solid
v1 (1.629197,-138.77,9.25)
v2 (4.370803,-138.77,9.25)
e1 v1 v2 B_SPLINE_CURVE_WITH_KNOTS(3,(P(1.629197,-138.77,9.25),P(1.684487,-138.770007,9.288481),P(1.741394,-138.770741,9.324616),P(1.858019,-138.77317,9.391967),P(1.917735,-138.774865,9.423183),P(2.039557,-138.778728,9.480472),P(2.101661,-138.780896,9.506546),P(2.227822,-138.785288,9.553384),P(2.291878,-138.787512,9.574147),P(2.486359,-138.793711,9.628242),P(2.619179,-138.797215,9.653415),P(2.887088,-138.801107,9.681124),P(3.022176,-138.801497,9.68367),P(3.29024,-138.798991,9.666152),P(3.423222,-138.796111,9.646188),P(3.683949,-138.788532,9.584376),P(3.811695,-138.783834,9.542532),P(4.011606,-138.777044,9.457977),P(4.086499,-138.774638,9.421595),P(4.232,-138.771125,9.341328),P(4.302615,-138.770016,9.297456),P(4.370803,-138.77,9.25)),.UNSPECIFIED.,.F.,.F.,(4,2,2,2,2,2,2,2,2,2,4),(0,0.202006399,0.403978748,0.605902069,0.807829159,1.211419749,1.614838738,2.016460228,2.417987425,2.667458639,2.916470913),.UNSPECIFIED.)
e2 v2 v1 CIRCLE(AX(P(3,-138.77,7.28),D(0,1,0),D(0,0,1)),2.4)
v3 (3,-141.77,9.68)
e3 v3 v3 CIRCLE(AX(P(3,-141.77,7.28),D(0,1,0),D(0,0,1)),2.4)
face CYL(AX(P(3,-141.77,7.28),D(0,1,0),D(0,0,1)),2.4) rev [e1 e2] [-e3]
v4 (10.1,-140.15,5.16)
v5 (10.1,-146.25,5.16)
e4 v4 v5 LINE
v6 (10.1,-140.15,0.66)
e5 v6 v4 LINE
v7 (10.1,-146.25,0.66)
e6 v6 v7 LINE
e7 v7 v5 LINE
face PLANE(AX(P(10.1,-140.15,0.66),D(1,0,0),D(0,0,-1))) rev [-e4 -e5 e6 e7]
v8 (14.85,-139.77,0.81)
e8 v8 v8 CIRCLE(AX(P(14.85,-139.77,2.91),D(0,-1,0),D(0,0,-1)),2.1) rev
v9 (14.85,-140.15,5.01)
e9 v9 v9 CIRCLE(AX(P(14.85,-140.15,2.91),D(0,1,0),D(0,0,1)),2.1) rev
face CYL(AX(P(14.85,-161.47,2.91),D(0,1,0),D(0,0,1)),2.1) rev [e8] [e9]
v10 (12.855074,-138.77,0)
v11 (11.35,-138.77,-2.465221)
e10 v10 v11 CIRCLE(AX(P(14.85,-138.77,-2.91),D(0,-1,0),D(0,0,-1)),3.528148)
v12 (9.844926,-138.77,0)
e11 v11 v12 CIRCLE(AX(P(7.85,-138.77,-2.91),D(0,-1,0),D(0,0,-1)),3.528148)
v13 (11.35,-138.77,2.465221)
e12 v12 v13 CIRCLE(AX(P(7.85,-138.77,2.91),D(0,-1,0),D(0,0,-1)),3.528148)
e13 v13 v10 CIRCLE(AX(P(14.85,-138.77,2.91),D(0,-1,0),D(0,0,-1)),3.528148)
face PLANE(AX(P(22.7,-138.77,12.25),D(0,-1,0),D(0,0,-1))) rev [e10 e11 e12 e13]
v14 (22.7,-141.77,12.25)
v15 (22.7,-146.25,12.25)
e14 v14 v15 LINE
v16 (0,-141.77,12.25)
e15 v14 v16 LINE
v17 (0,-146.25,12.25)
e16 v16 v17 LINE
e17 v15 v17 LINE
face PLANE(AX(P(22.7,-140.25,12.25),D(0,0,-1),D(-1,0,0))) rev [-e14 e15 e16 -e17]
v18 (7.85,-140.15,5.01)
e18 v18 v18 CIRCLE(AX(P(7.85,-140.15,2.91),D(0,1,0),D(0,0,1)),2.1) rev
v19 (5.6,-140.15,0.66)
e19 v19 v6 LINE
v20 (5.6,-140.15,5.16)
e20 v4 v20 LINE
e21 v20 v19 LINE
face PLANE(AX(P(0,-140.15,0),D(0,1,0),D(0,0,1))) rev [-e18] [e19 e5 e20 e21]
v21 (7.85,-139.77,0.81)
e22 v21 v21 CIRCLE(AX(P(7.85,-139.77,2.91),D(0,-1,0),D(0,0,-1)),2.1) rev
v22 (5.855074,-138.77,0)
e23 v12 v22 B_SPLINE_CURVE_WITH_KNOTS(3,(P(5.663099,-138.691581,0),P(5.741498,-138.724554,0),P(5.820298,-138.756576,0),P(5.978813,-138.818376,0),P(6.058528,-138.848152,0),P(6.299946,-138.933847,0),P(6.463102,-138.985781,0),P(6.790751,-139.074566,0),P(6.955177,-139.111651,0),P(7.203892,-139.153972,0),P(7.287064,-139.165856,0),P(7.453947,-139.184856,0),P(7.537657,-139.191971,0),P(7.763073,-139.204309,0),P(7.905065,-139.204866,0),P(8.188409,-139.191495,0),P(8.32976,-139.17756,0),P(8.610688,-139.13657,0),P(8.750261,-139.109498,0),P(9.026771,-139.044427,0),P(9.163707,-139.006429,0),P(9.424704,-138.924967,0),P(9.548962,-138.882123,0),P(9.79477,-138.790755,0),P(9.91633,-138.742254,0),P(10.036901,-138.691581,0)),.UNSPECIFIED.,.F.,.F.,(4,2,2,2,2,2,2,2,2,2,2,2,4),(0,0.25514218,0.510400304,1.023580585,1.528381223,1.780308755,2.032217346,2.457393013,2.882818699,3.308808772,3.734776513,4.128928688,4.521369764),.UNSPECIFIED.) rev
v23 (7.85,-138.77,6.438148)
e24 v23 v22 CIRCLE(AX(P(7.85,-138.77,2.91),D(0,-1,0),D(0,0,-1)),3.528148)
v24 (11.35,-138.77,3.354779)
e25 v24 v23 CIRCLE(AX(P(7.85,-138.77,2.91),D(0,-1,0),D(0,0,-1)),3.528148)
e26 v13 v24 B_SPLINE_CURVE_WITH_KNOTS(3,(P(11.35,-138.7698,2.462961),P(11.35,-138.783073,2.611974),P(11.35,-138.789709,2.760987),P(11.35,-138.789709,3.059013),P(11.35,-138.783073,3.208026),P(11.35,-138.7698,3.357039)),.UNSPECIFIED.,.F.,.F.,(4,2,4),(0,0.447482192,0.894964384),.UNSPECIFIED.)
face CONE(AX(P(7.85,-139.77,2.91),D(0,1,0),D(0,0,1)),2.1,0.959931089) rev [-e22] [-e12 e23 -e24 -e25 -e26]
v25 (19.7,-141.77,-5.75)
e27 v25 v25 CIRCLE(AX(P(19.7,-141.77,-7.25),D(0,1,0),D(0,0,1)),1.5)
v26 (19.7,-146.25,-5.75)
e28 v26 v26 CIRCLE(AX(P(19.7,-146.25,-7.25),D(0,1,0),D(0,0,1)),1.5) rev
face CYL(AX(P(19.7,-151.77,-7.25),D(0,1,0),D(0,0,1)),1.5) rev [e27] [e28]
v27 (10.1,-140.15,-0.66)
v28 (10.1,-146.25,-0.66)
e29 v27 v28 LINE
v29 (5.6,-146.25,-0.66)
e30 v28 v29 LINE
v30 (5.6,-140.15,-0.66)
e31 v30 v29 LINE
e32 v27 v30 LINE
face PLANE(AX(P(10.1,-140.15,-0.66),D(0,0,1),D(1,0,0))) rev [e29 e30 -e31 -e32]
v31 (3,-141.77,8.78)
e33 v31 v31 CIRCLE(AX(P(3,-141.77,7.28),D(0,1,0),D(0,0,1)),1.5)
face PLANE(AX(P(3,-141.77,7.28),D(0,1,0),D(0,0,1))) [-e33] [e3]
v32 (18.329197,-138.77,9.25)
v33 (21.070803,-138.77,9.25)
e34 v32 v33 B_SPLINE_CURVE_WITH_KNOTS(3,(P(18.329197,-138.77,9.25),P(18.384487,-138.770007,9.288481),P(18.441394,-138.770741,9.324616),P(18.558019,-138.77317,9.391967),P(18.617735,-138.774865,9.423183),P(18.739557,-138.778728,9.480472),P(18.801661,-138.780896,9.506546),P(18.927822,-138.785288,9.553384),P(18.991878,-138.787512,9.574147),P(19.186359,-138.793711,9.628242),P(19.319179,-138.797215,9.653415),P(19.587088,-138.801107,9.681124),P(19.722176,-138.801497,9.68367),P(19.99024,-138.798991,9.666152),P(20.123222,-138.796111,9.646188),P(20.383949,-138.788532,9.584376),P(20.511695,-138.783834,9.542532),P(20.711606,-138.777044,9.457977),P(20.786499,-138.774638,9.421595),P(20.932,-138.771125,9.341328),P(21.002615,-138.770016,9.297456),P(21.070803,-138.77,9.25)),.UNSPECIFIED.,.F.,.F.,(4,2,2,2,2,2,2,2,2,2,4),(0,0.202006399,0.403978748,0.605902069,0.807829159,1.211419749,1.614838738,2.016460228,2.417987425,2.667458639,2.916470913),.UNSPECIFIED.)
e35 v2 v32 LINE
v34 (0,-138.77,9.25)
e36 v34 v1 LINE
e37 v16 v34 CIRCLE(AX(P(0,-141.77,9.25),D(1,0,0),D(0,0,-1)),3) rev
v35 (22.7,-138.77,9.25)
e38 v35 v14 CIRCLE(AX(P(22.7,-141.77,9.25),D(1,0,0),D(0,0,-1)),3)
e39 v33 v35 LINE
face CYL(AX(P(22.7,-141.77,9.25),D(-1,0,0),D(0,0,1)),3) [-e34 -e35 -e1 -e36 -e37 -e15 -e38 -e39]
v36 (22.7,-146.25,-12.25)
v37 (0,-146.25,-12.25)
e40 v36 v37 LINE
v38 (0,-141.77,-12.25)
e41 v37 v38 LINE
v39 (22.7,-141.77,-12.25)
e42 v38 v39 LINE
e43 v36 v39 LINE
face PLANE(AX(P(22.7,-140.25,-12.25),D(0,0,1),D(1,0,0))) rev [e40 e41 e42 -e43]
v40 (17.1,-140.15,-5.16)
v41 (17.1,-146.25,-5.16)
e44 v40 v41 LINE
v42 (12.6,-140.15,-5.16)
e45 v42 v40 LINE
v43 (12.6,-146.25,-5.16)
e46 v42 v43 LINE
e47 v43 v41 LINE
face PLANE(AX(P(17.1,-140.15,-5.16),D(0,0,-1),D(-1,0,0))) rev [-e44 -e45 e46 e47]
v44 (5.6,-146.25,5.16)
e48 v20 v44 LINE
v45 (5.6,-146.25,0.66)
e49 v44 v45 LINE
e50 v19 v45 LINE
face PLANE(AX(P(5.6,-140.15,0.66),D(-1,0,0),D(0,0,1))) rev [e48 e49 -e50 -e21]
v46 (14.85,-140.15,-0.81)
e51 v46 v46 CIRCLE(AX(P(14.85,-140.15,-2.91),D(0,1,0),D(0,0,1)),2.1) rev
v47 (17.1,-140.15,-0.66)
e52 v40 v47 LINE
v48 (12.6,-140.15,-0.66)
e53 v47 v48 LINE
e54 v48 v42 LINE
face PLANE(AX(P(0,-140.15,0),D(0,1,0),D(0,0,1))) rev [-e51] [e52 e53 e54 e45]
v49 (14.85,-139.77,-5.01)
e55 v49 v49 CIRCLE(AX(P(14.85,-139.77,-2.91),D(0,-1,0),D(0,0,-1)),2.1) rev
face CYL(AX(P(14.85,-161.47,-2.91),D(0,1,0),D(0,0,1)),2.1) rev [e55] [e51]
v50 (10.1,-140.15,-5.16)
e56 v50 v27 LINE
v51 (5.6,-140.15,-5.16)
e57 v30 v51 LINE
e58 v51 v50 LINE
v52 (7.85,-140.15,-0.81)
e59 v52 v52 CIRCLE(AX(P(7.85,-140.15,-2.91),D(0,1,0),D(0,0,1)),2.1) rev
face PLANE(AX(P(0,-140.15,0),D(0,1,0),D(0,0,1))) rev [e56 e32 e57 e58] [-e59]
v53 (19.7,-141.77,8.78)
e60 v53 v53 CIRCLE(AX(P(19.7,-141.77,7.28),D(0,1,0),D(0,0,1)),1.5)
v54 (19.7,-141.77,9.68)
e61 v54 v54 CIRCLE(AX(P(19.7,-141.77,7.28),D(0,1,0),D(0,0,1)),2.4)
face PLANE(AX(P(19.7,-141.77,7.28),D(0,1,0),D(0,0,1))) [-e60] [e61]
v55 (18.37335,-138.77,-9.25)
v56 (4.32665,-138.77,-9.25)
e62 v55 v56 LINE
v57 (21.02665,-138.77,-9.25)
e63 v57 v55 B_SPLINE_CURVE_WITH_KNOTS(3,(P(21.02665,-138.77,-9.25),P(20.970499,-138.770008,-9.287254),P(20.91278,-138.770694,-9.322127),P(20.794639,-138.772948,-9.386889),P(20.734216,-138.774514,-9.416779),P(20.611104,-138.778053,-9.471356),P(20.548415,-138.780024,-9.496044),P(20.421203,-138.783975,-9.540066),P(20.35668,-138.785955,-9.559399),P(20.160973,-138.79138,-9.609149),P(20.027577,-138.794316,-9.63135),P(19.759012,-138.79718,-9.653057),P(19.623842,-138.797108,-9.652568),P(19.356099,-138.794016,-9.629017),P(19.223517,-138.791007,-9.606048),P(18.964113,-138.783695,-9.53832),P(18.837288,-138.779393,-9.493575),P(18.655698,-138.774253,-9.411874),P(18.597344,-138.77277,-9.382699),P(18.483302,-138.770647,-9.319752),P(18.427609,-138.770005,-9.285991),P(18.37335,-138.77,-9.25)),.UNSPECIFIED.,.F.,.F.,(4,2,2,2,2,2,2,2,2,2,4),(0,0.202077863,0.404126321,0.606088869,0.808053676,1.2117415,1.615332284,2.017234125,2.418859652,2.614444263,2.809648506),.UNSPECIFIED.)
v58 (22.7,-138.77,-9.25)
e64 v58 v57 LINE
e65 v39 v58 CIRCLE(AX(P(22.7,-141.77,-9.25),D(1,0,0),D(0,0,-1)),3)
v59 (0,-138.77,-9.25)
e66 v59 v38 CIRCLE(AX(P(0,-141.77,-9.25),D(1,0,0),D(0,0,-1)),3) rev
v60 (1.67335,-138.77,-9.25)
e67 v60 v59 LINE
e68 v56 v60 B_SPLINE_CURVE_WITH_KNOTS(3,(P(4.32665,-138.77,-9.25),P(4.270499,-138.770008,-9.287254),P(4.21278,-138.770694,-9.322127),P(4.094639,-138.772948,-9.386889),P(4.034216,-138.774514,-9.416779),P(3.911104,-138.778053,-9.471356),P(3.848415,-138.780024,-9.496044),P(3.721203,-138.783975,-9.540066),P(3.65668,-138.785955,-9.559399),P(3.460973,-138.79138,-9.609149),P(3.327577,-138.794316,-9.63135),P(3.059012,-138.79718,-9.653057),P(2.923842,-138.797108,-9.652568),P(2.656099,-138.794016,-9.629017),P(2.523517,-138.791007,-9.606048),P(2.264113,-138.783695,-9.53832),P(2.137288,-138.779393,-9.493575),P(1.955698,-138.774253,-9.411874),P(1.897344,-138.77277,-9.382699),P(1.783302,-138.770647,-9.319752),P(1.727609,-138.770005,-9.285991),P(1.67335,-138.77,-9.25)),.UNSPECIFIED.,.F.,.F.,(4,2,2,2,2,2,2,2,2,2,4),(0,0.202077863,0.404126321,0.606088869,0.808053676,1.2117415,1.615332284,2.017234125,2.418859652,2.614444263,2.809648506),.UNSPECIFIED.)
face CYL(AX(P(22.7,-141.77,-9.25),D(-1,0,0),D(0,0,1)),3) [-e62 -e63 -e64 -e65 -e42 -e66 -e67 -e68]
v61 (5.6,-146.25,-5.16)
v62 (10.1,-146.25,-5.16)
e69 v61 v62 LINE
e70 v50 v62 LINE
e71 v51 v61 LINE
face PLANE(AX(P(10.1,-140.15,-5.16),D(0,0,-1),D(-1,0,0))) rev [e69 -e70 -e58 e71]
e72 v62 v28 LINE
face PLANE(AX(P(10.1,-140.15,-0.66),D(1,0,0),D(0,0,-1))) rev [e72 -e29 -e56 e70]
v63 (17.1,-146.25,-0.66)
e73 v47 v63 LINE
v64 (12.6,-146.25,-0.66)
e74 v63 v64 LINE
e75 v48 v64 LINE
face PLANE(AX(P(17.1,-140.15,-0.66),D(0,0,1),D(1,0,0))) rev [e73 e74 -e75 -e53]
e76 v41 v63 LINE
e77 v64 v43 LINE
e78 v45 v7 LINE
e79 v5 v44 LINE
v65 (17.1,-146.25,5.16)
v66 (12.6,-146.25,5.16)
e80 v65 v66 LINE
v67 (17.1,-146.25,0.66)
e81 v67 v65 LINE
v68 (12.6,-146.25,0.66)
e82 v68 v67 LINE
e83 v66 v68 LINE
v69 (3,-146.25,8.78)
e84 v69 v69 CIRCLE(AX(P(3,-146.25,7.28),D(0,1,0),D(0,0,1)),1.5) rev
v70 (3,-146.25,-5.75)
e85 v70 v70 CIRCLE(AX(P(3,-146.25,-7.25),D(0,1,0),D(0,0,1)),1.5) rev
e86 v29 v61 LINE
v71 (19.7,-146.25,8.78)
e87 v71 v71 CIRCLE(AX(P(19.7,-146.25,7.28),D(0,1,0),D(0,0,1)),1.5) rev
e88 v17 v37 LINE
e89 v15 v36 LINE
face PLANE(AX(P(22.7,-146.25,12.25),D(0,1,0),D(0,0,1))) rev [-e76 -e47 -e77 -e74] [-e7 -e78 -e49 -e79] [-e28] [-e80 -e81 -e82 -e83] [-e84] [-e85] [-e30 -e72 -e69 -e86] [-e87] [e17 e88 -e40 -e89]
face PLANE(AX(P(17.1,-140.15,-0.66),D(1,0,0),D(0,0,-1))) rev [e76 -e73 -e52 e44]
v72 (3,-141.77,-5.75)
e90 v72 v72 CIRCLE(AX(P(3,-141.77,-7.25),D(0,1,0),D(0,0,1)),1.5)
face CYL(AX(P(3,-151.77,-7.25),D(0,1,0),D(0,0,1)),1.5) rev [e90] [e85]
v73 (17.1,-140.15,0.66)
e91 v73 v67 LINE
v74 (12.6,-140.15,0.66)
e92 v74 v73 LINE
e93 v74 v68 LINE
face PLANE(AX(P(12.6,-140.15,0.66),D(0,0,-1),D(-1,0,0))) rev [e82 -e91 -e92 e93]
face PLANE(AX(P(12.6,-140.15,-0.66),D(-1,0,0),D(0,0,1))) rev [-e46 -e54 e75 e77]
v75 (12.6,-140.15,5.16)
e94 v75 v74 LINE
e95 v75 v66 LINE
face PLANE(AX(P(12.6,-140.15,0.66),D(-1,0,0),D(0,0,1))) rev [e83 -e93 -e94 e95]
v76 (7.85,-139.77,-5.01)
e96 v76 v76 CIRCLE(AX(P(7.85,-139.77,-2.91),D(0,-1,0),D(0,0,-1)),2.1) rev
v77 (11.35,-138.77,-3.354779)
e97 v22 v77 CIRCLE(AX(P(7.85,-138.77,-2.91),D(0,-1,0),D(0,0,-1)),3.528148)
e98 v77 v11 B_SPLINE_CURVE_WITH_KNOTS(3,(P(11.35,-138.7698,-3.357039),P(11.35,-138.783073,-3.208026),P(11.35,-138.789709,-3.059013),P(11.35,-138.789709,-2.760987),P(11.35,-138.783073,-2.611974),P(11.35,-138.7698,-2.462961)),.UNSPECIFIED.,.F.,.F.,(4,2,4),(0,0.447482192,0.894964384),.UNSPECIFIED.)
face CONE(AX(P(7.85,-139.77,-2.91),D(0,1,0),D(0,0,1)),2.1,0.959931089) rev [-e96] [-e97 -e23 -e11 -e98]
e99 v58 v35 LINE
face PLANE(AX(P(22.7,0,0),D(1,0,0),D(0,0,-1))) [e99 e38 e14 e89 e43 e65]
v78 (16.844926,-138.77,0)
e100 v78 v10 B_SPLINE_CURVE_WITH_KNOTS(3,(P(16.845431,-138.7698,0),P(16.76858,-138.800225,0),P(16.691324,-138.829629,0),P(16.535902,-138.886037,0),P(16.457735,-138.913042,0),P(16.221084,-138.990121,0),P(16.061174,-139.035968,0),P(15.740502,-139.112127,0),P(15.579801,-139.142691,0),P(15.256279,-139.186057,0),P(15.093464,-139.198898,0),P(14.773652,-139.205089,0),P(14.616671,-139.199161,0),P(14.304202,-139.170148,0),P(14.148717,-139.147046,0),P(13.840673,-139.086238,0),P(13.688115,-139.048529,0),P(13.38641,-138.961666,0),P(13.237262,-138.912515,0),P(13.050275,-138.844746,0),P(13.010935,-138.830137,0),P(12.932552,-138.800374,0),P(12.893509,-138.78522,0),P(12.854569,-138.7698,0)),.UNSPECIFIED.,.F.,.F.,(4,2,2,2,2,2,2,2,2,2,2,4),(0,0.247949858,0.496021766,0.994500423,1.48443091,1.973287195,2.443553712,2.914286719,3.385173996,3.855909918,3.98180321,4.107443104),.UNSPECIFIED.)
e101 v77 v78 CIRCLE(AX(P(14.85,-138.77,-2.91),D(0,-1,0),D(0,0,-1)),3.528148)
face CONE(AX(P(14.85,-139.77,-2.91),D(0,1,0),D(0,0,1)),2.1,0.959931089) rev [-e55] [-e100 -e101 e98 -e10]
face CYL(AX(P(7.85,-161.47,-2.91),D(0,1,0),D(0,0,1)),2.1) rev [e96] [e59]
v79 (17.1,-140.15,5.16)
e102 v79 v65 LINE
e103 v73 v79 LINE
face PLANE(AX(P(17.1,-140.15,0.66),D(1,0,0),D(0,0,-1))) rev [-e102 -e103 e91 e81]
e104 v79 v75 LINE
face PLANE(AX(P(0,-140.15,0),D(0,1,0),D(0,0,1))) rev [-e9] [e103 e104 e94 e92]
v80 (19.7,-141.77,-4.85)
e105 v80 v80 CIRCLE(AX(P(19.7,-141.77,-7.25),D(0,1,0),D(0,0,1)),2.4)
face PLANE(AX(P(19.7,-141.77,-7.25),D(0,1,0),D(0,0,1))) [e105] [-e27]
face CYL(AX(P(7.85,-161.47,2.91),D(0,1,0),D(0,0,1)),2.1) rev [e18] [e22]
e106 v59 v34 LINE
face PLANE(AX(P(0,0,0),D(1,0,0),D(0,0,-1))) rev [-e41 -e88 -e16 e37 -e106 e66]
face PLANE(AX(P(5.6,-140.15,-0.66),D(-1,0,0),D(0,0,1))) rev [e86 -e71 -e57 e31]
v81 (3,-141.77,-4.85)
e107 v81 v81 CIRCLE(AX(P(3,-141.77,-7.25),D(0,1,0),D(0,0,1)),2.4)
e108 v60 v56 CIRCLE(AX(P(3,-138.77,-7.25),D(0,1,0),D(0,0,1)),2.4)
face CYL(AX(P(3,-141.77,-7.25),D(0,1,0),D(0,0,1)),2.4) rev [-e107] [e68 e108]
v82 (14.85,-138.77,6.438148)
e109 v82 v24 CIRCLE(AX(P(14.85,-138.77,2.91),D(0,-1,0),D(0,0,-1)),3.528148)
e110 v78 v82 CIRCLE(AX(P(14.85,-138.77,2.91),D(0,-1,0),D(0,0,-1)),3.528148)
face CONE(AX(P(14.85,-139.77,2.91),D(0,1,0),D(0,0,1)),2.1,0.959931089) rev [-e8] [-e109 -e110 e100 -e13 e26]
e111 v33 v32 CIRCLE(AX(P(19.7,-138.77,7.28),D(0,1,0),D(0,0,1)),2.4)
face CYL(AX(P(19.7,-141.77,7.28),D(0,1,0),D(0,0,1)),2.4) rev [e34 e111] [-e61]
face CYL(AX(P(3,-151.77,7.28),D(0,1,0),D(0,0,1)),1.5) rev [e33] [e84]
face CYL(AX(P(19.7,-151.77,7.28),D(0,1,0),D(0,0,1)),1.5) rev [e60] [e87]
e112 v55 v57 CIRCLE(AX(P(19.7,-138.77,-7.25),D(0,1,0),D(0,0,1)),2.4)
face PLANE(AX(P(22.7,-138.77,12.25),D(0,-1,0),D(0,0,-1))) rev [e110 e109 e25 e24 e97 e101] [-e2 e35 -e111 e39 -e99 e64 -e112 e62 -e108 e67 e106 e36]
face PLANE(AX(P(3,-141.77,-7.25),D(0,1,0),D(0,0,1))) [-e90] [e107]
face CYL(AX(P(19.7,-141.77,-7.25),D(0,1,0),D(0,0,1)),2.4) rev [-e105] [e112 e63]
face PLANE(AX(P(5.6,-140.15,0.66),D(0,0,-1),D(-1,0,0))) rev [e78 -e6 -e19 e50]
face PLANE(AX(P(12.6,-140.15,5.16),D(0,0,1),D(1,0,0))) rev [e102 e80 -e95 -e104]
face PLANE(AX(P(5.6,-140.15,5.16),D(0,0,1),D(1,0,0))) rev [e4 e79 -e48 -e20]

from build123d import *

# Parameters (mm, degrees)
BOSS_EXTRUDE1_DEPTH = 22.7
SKETCH2_R           = 2.1
CUT_EXTRUDE1_DEPTH  = 22.7
SKETCH4_W           = 4.5
SKETCH4_H           = 4.5
CUT_EXTRUDE2_DEPTH  = 6.1
SKETCH7_R           = 1.5
CUT_EXTRUDE3_DEPTH  = 13
SKETCH9_R           = 2.4
CUT_EXTRUDE4_DEPTH  = 3
FILLET1_R           = 3
CHAMFER2_SIZE       = 1.428148007
CHAMFER2_SIZE_2     = 1


with BuildPart() as part:
    # Sketch1 → Boss-Extrude1 (new body)
    with BuildSketch(Plane(origin=(0, 0, 0), x_dir=(0, 0, -1), z_dir=(1, 0, 0))):
        Polygon((-12.25, -146.25), (12.25, -146.25), (12.25, -140.25), (12.25, -138.77), (2.91, -138.77), (-2.91, -138.77), (-12.25, -138.77), (-12.25, -140.25), align=None)
    extrude(amount=BOSS_EXTRUDE1_DEPTH)

    # Sketch2 → Cut-Extrude1 (cut)
    with BuildSketch(Plane(origin=(0, -138.77, 0), x_dir=(1, 0, 0), z_dir=(0, 1, 0))):
        with Locations(Location((14.85, 2.91, 0), (0, 0, 270))):
            Circle(SKETCH2_R)
        with Locations(Location((7.85, 2.91, 0), (0, 0, 270))):
            Circle(SKETCH2_R)
        with Locations(Location((14.85, -2.91, 0), (0, 0, 270))):
            Circle(SKETCH2_R)
        with Locations(Location((7.85, -2.91, 0), (0, 0, 270))):
            Circle(SKETCH2_R)
    extrude(amount=-CUT_EXTRUDE1_DEPTH, mode=Mode.SUBTRACT)

    # Sketch4 → Cut-Extrude2 (cut)
    with BuildSketch(Plane.XZ.offset(146.25)):
        with Locations((7.85, 2.91)):
            Rectangle(SKETCH4_W, SKETCH4_H)
        with Locations((14.85, 2.91)):
            Rectangle(SKETCH4_W, SKETCH4_H)
        with Locations((14.85, -2.91)):
            Rectangle(SKETCH4_W, SKETCH4_H)
        with Locations((7.85, -2.91)):
            Rectangle(SKETCH4_W, SKETCH4_H)
    extrude(amount=-CUT_EXTRUDE2_DEPTH, mode=Mode.SUBTRACT)

    # Sketch7 → Cut-Extrude3 (cut)
    with BuildSketch(Plane(origin=(0, -138.77, 0), x_dir=(-1, 0, 0), z_dir=(0, -1, 0))):
        with Locations(Location((-3, -7.28, 0), (0, 0, 270))):
            Circle(SKETCH7_R)
        with Locations(Location((-19.7, -7.28, 0), (0, 0, 270))):
            Circle(SKETCH7_R)
        with Locations(Location((-19.7, 7.25, 0), (0, 0, 270))):
            Circle(SKETCH7_R)
        with Locations(Location((-3, 7.25, 0), (0, 0, 270))):
            Circle(SKETCH7_R)
    extrude(amount=CUT_EXTRUDE3_DEPTH, mode=Mode.SUBTRACT)

    # Sketch9 → Cut-Extrude4 (cut)
    with BuildSketch(Plane(origin=(0, -138.77, 0), x_dir=(1, 0, 0), z_dir=(0, 1, 0))):
        with Locations(Location((3, 7.25, 0), (0, 0, 270))):
            Circle(SKETCH9_R)
        with Locations(Location((19.7, 7.25, 0), (0, 0, 270))):
            Circle(SKETCH9_R)
        with Locations(Location((19.7, -7.28, 0), (0, 0, 270))):
            Circle(SKETCH9_R)
        with Locations(Location((3, -7.28, 0), (0, 0, 270))):
            Circle(SKETCH9_R)
    extrude(amount=-CUT_EXTRUDE4_DEPTH, mode=Mode.SUBTRACT)

    # Fillet1
    # the kernel refuses this fillet: 3 mm, written as the material it takes off along each edge
    with BuildSketch(Plane(origin=(-7.5, -138.77, 12.25), x_dir=(0, -1, 0), z_dir=(1, 0, 0))) as fillet1_piece_1:
        with BuildLine():
            CenterArc((FILLET1_R, FILLET1_R), FILLET1_R, 180, 90)
            Line((0, FILLET1_R), (0, 0))
            Line((0, 0), (FILLET1_R, 0))
        make_face()
    extrude(amount=37.7, mode=Mode.SUBTRACT)
    with BuildSketch(Plane(origin=(-7.5, -138.77, -12.25), x_dir=(0, -1, 0), z_dir=(1, 0, 0))) as fillet1_piece_2:
        with BuildLine():
            CenterArc((FILLET1_R, -FILLET1_R), FILLET1_R, 90, 90)
            Line((0, -FILLET1_R), (0, 0))
            Line((0, 0), (FILLET1_R, 0))
        make_face()
    extrude(amount=37.7, mode=Mode.SUBTRACT)

    # Chamfer2
    # the kernel refuses this chamfer: 1.428148007, 1 mm, written as the material it takes off along each edge
    with BuildSketch(Plane(origin=(7.85, -138.77, 2.91), x_dir=(0, 0, 1), z_dir=(-1, 0, 0))) as chamfer2_piece_1:
        Polygon((2.1 + CHAMFER2_SIZE, 0), (2.1, -CHAMFER2_SIZE_2), (2.1, 0), align=None)
    revolve(axis=Axis((7.85, -138.77, 2.91), (0, 1, 0)), mode=Mode.SUBTRACT)
    with BuildSketch(Plane(origin=(7.85, -138.77, -2.91), x_dir=(0, 0, 1), z_dir=(-1, 0, 0))) as chamfer2_piece_2:
        Polygon((2.1 + CHAMFER2_SIZE, 0), (2.1, -CHAMFER2_SIZE_2), (2.1, 0), align=None)
    revolve(axis=Axis((7.85, -138.77, -2.91), (0, 1, 0)), mode=Mode.SUBTRACT)
    with BuildSketch(Plane(origin=(14.85, -138.77, -2.91), x_dir=(0, 0, 1), z_dir=(-1, 0, 0))) as chamfer2_piece_3:
        Polygon((2.1 + CHAMFER2_SIZE, 0), (2.1, -CHAMFER2_SIZE_2), (2.1, 0), align=None)
    revolve(axis=Axis((14.85, -138.77, -2.91), (0, 1, 0)), mode=Mode.SUBTRACT)
    with BuildSketch(Plane(origin=(14.85, -138.77, 2.91), x_dir=(0, 0, 1), z_dir=(-1, 0, 0))) as chamfer2_piece_4:
        Polygon((2.1 + CHAMFER2_SIZE, 0), (2.1, -CHAMFER2_SIZE_2), (2.1, 0), align=None)
    revolve(axis=Axis((14.85, -138.77, 2.91), (0, 1, 0)), mode=Mode.SUBTRACT)


solid = part.part
